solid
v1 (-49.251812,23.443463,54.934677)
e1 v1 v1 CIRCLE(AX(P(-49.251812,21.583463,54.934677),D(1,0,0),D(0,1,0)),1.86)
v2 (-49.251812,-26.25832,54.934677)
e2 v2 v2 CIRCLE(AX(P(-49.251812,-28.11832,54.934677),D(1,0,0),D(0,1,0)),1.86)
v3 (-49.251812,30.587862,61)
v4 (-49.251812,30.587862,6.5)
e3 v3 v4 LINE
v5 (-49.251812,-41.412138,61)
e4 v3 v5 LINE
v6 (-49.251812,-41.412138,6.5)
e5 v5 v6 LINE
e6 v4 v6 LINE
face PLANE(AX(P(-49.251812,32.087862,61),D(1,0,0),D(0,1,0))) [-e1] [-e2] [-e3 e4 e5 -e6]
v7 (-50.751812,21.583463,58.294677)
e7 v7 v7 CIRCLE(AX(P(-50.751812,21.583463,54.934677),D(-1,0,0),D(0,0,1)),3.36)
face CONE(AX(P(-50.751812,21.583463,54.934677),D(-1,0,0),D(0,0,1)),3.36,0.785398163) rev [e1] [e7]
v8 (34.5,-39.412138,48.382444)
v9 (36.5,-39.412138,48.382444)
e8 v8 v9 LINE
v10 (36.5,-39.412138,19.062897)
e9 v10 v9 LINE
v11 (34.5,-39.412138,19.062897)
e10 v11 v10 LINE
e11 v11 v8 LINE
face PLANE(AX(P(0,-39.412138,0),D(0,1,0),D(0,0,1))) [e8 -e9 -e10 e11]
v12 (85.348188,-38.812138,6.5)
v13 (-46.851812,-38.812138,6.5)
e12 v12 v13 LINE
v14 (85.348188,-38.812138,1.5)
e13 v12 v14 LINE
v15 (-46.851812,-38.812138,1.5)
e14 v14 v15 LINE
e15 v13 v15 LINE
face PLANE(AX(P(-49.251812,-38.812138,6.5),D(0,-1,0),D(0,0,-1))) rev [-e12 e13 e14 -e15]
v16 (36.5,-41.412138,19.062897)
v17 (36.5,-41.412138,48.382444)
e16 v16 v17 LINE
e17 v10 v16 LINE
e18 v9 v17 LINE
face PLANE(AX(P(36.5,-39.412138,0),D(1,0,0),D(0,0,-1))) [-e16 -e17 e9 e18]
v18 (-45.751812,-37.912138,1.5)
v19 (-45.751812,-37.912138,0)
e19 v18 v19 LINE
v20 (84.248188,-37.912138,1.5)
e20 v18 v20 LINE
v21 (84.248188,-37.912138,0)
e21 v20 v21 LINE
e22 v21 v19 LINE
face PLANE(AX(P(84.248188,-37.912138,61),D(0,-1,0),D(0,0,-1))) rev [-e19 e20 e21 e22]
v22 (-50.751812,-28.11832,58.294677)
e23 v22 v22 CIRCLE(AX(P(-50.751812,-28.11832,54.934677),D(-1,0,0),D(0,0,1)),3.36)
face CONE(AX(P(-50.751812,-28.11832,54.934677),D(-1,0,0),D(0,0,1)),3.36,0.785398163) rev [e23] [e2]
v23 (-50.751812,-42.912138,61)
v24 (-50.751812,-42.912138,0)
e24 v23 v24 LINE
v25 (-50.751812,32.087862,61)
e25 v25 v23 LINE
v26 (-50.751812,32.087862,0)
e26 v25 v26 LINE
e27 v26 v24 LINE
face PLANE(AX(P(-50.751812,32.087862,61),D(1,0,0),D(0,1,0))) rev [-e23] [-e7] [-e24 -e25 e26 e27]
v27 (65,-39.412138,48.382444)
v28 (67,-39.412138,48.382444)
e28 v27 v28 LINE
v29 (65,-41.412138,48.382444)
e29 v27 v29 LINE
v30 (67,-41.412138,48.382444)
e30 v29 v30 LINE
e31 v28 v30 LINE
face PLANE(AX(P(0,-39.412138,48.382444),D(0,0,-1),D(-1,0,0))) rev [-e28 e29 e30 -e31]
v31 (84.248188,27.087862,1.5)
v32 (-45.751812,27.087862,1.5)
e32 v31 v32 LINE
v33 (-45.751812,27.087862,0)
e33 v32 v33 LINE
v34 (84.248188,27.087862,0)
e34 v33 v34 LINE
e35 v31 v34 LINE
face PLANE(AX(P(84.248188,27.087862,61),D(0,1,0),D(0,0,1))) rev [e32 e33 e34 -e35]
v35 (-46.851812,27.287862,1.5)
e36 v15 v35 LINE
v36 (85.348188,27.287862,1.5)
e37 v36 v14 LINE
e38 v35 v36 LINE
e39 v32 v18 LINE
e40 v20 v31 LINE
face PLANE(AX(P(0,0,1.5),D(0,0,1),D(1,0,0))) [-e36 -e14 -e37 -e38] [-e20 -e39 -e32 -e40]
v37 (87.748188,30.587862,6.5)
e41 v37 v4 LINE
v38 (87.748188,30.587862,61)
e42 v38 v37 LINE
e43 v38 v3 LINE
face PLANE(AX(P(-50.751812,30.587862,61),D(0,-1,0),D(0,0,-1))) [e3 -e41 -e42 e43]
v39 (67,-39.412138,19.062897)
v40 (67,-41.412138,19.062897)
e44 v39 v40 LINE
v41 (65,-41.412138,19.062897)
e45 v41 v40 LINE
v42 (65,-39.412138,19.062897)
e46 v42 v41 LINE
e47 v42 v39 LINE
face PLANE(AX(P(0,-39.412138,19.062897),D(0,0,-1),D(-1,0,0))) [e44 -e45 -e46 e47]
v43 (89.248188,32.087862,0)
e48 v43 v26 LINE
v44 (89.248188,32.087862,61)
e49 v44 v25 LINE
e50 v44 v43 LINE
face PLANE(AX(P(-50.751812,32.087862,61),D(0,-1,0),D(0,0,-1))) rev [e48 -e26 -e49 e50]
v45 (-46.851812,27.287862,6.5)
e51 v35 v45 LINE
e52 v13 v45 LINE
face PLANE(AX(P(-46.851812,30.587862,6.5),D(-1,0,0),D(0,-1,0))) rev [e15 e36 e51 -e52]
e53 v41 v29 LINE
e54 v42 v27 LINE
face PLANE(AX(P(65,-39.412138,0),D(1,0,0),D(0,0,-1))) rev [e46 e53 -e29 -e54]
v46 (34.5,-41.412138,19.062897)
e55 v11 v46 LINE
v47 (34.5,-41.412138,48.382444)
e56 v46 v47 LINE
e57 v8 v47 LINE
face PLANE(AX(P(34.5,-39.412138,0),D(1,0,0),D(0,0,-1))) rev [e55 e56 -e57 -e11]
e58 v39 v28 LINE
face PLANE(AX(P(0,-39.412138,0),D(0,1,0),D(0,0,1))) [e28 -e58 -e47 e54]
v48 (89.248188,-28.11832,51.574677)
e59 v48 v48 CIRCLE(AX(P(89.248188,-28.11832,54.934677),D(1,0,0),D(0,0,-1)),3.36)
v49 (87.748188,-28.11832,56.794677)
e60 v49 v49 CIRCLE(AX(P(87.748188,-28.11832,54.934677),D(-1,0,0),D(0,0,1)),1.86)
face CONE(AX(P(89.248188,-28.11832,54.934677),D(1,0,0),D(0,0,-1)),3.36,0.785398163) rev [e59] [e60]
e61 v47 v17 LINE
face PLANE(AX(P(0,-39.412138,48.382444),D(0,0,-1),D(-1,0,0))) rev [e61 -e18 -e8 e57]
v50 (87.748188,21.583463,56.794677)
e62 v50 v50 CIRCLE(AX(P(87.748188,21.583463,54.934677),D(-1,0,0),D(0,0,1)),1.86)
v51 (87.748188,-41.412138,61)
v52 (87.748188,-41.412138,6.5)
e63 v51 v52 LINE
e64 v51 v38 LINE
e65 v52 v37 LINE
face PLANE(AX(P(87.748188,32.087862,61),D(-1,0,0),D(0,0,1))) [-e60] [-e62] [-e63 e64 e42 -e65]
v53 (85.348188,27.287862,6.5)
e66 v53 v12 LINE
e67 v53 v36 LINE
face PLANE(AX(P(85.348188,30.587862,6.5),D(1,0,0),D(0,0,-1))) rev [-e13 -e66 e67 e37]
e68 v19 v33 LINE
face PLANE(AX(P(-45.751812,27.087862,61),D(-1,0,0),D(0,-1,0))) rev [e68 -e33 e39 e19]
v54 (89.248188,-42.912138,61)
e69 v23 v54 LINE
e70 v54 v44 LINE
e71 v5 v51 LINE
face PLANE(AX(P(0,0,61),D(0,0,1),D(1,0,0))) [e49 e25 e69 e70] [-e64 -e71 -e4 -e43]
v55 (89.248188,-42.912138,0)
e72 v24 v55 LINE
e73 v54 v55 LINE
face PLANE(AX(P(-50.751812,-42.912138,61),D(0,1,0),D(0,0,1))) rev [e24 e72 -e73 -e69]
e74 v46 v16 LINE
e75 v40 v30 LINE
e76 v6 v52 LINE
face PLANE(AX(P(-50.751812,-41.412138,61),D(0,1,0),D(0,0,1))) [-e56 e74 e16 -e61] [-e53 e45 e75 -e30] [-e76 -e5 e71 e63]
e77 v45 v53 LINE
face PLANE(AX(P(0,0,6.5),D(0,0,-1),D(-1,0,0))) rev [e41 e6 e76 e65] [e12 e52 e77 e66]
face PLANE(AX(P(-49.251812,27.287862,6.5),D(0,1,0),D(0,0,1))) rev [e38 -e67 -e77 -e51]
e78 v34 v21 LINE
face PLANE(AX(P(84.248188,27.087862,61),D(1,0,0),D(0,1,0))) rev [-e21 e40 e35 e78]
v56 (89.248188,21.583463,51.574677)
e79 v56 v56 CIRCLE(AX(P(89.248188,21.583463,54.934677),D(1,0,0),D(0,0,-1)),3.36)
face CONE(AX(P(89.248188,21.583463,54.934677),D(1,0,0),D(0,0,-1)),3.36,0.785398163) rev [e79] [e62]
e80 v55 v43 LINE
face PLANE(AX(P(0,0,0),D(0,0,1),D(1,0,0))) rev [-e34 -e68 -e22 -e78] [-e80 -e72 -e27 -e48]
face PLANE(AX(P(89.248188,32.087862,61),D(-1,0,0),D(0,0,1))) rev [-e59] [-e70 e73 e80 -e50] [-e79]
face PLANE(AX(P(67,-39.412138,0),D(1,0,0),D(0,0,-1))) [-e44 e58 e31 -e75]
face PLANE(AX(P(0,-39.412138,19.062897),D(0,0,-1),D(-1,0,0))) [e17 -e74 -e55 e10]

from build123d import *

# Parameters (mm, degrees)
SKETCH_1_W          = 140
SKETCH_1_H          = 75
EXTRUDE_1_DEPTH     = 61
SHELL_1_T           = -1.5
SKETCH_3_W          = 130
SKETCH_3_H          = 65
CUT_EXTRUDE_1_DEPTH = 117.308601118
SKETCH_4_W          = 137
SKETCH_4_H          = 2.6
SKETCH_4_H_2        = 3.3
EXTRUDE_2_DEPTH     = 5
SKETCH_5_W          = 2.4
SKETCH_5_H          = 69.4
EXTRUDE_3_DEPTH     = 5
SKETCH_29_W         = 2
SKETCH_29_H         = 29.319547491
EXTRUDE_4_DEPTH     = 2


# Read off the part's stored shape, not the designer's step: M3 六角凹锥坑螺钉的锥形沉头孔1, M3 六角凹锥坑螺钉的锥形沉头孔2
with BuildPart() as part:
    # 草图1 → 凸台-拉伸1 (new body)
    with BuildSketch(Plane.XY):
        with Locations((19.248188406, -5.412137681)):
            Rectangle(SKETCH_1_W, SKETCH_1_H)
    extrude(amount=EXTRUDE_1_DEPTH)

    # 抽壳1
    shell_1_openings = [part.faces().sort_by_distance(p)[0] for p in [
        (19.248188406, -5.412137681, 61),
    ]]
    offset(amount=SHELL_1_T, openings=shell_1_openings, kind=Kind.INTERSECTION)

    # 草图3 → 切除-拉伸1 (cut, through all)
    with BuildSketch(Plane(origin=(0, 0, 0), x_dir=(-1, 0, 0), z_dir=(0, 0, -1))):
        with Locations((-19.248188406, -5.412137681)):
            Rectangle(SKETCH_3_W, SKETCH_3_H)
    extrude(amount=-CUT_EXTRUDE_1_DEPTH, mode=Mode.SUBTRACT)

    # 草图4 → 凸台-拉伸2 (add)
    with BuildSketch(Plane.XY.offset(1.5)):
        with Locations((19.248188406, -40.112137681)):
            Rectangle(SKETCH_4_W, SKETCH_4_H)
        with Locations((19.248188406, 28.937862319)):
            Rectangle(SKETCH_4_W, SKETCH_4_H_2)
    extrude(amount=EXTRUDE_2_DEPTH)

    # 草图5 → 凸台-拉伸3 (add)
    with BuildSketch(Plane.XY.offset(1.5)):
        with Locations((-48.051811594, -4.112137681)):
            Rectangle(SKETCH_5_W, SKETCH_5_H)
        with Locations((86.548188406, -4.112137681)):
            Rectangle(SKETCH_5_W, SKETCH_5_H)
    extrude(amount=EXTRUDE_3_DEPTH)

    # M3 六角凹锥坑螺钉的锥形沉头孔1 outline → M3 六角凹锥坑螺钉的锥形沉头孔1 (revolve, cut)
    with BuildSketch(Plane(origin=(0, -28.118319618, 54.934676649), x_dir=(0, 1, 0), z_dir=(0, 0, -1))):
        Polygon((0, -50.751811594), (3.36, -50.751811594), (1.86, -49.251811594), (0, -49.251811594), align=None)
    revolve(axis=Axis((0, -28.118319618, 54.934676649), (1, 0, 0)), mode=Mode.SUBTRACT)

    # Hole Wizard M3 _1 2 outline → Hole Wizard M3 _1 2 (revolve, cut)
    with BuildSketch(Plane(origin=(0, 21.583463225, 54.934676649), x_dir=(0, 1, 0), z_dir=(0, 0, -1))):
        Polygon((0, -50.751811594), (3.36, -50.751811594), (1.86, -49.251811594), (0, -49.251811594), align=None)
    revolve(axis=Axis((0, 21.583463225, 54.934676649), (1, 0, 0)), mode=Mode.SUBTRACT)

    # M3 六角凹锥坑螺钉的锥形沉头孔2 outline → M3 六角凹锥坑螺钉的锥形沉头孔2 (revolve, cut)
    with BuildSketch(Plane(origin=(0, -28.118319618, 54.934676649), x_dir=(0, 1, 0), z_dir=(0, 0, -1))):
        Polygon((3.36, 89.248188406), (0, 89.248188406), (0, 87.748188406), (1.86, 87.748188406), align=None)
    revolve(axis=Axis((0, -28.118319618, 54.934676649), (1, 0, 0)), mode=Mode.SUBTRACT)

    # Hole Wizard M3 _2 2 outline → Hole Wizard M3 _2 2 (revolve, cut)
    with BuildSketch(Plane(origin=(0, 21.583463225, 54.934676649), x_dir=(0, 1, 0), z_dir=(0, 0, -1))):
        Polygon((3.36, 89.248188406), (0, 89.248188406), (0, 87.748188406), (1.86, 87.748188406), align=None)
    revolve(axis=Axis((0, 21.583463225, 54.934676649), (1, 0, 0)), mode=Mode.SUBTRACT)

    # 草图29 → 凸台-拉伸4 (add)
    with BuildSketch(Plane(origin=(0, -41.412137681, 0), x_dir=(1, 0, 0), z_dir=(0, 1, 0))):
        with Locations((35.5, -33.722670624)):
            Rectangle(SKETCH_29_W, SKETCH_29_H)
        with Locations((66, -33.722670624)):
            Rectangle(SKETCH_29_W, SKETCH_29_H)
    extrude(amount=EXTRUDE_4_DEPTH)


solid = part.part
